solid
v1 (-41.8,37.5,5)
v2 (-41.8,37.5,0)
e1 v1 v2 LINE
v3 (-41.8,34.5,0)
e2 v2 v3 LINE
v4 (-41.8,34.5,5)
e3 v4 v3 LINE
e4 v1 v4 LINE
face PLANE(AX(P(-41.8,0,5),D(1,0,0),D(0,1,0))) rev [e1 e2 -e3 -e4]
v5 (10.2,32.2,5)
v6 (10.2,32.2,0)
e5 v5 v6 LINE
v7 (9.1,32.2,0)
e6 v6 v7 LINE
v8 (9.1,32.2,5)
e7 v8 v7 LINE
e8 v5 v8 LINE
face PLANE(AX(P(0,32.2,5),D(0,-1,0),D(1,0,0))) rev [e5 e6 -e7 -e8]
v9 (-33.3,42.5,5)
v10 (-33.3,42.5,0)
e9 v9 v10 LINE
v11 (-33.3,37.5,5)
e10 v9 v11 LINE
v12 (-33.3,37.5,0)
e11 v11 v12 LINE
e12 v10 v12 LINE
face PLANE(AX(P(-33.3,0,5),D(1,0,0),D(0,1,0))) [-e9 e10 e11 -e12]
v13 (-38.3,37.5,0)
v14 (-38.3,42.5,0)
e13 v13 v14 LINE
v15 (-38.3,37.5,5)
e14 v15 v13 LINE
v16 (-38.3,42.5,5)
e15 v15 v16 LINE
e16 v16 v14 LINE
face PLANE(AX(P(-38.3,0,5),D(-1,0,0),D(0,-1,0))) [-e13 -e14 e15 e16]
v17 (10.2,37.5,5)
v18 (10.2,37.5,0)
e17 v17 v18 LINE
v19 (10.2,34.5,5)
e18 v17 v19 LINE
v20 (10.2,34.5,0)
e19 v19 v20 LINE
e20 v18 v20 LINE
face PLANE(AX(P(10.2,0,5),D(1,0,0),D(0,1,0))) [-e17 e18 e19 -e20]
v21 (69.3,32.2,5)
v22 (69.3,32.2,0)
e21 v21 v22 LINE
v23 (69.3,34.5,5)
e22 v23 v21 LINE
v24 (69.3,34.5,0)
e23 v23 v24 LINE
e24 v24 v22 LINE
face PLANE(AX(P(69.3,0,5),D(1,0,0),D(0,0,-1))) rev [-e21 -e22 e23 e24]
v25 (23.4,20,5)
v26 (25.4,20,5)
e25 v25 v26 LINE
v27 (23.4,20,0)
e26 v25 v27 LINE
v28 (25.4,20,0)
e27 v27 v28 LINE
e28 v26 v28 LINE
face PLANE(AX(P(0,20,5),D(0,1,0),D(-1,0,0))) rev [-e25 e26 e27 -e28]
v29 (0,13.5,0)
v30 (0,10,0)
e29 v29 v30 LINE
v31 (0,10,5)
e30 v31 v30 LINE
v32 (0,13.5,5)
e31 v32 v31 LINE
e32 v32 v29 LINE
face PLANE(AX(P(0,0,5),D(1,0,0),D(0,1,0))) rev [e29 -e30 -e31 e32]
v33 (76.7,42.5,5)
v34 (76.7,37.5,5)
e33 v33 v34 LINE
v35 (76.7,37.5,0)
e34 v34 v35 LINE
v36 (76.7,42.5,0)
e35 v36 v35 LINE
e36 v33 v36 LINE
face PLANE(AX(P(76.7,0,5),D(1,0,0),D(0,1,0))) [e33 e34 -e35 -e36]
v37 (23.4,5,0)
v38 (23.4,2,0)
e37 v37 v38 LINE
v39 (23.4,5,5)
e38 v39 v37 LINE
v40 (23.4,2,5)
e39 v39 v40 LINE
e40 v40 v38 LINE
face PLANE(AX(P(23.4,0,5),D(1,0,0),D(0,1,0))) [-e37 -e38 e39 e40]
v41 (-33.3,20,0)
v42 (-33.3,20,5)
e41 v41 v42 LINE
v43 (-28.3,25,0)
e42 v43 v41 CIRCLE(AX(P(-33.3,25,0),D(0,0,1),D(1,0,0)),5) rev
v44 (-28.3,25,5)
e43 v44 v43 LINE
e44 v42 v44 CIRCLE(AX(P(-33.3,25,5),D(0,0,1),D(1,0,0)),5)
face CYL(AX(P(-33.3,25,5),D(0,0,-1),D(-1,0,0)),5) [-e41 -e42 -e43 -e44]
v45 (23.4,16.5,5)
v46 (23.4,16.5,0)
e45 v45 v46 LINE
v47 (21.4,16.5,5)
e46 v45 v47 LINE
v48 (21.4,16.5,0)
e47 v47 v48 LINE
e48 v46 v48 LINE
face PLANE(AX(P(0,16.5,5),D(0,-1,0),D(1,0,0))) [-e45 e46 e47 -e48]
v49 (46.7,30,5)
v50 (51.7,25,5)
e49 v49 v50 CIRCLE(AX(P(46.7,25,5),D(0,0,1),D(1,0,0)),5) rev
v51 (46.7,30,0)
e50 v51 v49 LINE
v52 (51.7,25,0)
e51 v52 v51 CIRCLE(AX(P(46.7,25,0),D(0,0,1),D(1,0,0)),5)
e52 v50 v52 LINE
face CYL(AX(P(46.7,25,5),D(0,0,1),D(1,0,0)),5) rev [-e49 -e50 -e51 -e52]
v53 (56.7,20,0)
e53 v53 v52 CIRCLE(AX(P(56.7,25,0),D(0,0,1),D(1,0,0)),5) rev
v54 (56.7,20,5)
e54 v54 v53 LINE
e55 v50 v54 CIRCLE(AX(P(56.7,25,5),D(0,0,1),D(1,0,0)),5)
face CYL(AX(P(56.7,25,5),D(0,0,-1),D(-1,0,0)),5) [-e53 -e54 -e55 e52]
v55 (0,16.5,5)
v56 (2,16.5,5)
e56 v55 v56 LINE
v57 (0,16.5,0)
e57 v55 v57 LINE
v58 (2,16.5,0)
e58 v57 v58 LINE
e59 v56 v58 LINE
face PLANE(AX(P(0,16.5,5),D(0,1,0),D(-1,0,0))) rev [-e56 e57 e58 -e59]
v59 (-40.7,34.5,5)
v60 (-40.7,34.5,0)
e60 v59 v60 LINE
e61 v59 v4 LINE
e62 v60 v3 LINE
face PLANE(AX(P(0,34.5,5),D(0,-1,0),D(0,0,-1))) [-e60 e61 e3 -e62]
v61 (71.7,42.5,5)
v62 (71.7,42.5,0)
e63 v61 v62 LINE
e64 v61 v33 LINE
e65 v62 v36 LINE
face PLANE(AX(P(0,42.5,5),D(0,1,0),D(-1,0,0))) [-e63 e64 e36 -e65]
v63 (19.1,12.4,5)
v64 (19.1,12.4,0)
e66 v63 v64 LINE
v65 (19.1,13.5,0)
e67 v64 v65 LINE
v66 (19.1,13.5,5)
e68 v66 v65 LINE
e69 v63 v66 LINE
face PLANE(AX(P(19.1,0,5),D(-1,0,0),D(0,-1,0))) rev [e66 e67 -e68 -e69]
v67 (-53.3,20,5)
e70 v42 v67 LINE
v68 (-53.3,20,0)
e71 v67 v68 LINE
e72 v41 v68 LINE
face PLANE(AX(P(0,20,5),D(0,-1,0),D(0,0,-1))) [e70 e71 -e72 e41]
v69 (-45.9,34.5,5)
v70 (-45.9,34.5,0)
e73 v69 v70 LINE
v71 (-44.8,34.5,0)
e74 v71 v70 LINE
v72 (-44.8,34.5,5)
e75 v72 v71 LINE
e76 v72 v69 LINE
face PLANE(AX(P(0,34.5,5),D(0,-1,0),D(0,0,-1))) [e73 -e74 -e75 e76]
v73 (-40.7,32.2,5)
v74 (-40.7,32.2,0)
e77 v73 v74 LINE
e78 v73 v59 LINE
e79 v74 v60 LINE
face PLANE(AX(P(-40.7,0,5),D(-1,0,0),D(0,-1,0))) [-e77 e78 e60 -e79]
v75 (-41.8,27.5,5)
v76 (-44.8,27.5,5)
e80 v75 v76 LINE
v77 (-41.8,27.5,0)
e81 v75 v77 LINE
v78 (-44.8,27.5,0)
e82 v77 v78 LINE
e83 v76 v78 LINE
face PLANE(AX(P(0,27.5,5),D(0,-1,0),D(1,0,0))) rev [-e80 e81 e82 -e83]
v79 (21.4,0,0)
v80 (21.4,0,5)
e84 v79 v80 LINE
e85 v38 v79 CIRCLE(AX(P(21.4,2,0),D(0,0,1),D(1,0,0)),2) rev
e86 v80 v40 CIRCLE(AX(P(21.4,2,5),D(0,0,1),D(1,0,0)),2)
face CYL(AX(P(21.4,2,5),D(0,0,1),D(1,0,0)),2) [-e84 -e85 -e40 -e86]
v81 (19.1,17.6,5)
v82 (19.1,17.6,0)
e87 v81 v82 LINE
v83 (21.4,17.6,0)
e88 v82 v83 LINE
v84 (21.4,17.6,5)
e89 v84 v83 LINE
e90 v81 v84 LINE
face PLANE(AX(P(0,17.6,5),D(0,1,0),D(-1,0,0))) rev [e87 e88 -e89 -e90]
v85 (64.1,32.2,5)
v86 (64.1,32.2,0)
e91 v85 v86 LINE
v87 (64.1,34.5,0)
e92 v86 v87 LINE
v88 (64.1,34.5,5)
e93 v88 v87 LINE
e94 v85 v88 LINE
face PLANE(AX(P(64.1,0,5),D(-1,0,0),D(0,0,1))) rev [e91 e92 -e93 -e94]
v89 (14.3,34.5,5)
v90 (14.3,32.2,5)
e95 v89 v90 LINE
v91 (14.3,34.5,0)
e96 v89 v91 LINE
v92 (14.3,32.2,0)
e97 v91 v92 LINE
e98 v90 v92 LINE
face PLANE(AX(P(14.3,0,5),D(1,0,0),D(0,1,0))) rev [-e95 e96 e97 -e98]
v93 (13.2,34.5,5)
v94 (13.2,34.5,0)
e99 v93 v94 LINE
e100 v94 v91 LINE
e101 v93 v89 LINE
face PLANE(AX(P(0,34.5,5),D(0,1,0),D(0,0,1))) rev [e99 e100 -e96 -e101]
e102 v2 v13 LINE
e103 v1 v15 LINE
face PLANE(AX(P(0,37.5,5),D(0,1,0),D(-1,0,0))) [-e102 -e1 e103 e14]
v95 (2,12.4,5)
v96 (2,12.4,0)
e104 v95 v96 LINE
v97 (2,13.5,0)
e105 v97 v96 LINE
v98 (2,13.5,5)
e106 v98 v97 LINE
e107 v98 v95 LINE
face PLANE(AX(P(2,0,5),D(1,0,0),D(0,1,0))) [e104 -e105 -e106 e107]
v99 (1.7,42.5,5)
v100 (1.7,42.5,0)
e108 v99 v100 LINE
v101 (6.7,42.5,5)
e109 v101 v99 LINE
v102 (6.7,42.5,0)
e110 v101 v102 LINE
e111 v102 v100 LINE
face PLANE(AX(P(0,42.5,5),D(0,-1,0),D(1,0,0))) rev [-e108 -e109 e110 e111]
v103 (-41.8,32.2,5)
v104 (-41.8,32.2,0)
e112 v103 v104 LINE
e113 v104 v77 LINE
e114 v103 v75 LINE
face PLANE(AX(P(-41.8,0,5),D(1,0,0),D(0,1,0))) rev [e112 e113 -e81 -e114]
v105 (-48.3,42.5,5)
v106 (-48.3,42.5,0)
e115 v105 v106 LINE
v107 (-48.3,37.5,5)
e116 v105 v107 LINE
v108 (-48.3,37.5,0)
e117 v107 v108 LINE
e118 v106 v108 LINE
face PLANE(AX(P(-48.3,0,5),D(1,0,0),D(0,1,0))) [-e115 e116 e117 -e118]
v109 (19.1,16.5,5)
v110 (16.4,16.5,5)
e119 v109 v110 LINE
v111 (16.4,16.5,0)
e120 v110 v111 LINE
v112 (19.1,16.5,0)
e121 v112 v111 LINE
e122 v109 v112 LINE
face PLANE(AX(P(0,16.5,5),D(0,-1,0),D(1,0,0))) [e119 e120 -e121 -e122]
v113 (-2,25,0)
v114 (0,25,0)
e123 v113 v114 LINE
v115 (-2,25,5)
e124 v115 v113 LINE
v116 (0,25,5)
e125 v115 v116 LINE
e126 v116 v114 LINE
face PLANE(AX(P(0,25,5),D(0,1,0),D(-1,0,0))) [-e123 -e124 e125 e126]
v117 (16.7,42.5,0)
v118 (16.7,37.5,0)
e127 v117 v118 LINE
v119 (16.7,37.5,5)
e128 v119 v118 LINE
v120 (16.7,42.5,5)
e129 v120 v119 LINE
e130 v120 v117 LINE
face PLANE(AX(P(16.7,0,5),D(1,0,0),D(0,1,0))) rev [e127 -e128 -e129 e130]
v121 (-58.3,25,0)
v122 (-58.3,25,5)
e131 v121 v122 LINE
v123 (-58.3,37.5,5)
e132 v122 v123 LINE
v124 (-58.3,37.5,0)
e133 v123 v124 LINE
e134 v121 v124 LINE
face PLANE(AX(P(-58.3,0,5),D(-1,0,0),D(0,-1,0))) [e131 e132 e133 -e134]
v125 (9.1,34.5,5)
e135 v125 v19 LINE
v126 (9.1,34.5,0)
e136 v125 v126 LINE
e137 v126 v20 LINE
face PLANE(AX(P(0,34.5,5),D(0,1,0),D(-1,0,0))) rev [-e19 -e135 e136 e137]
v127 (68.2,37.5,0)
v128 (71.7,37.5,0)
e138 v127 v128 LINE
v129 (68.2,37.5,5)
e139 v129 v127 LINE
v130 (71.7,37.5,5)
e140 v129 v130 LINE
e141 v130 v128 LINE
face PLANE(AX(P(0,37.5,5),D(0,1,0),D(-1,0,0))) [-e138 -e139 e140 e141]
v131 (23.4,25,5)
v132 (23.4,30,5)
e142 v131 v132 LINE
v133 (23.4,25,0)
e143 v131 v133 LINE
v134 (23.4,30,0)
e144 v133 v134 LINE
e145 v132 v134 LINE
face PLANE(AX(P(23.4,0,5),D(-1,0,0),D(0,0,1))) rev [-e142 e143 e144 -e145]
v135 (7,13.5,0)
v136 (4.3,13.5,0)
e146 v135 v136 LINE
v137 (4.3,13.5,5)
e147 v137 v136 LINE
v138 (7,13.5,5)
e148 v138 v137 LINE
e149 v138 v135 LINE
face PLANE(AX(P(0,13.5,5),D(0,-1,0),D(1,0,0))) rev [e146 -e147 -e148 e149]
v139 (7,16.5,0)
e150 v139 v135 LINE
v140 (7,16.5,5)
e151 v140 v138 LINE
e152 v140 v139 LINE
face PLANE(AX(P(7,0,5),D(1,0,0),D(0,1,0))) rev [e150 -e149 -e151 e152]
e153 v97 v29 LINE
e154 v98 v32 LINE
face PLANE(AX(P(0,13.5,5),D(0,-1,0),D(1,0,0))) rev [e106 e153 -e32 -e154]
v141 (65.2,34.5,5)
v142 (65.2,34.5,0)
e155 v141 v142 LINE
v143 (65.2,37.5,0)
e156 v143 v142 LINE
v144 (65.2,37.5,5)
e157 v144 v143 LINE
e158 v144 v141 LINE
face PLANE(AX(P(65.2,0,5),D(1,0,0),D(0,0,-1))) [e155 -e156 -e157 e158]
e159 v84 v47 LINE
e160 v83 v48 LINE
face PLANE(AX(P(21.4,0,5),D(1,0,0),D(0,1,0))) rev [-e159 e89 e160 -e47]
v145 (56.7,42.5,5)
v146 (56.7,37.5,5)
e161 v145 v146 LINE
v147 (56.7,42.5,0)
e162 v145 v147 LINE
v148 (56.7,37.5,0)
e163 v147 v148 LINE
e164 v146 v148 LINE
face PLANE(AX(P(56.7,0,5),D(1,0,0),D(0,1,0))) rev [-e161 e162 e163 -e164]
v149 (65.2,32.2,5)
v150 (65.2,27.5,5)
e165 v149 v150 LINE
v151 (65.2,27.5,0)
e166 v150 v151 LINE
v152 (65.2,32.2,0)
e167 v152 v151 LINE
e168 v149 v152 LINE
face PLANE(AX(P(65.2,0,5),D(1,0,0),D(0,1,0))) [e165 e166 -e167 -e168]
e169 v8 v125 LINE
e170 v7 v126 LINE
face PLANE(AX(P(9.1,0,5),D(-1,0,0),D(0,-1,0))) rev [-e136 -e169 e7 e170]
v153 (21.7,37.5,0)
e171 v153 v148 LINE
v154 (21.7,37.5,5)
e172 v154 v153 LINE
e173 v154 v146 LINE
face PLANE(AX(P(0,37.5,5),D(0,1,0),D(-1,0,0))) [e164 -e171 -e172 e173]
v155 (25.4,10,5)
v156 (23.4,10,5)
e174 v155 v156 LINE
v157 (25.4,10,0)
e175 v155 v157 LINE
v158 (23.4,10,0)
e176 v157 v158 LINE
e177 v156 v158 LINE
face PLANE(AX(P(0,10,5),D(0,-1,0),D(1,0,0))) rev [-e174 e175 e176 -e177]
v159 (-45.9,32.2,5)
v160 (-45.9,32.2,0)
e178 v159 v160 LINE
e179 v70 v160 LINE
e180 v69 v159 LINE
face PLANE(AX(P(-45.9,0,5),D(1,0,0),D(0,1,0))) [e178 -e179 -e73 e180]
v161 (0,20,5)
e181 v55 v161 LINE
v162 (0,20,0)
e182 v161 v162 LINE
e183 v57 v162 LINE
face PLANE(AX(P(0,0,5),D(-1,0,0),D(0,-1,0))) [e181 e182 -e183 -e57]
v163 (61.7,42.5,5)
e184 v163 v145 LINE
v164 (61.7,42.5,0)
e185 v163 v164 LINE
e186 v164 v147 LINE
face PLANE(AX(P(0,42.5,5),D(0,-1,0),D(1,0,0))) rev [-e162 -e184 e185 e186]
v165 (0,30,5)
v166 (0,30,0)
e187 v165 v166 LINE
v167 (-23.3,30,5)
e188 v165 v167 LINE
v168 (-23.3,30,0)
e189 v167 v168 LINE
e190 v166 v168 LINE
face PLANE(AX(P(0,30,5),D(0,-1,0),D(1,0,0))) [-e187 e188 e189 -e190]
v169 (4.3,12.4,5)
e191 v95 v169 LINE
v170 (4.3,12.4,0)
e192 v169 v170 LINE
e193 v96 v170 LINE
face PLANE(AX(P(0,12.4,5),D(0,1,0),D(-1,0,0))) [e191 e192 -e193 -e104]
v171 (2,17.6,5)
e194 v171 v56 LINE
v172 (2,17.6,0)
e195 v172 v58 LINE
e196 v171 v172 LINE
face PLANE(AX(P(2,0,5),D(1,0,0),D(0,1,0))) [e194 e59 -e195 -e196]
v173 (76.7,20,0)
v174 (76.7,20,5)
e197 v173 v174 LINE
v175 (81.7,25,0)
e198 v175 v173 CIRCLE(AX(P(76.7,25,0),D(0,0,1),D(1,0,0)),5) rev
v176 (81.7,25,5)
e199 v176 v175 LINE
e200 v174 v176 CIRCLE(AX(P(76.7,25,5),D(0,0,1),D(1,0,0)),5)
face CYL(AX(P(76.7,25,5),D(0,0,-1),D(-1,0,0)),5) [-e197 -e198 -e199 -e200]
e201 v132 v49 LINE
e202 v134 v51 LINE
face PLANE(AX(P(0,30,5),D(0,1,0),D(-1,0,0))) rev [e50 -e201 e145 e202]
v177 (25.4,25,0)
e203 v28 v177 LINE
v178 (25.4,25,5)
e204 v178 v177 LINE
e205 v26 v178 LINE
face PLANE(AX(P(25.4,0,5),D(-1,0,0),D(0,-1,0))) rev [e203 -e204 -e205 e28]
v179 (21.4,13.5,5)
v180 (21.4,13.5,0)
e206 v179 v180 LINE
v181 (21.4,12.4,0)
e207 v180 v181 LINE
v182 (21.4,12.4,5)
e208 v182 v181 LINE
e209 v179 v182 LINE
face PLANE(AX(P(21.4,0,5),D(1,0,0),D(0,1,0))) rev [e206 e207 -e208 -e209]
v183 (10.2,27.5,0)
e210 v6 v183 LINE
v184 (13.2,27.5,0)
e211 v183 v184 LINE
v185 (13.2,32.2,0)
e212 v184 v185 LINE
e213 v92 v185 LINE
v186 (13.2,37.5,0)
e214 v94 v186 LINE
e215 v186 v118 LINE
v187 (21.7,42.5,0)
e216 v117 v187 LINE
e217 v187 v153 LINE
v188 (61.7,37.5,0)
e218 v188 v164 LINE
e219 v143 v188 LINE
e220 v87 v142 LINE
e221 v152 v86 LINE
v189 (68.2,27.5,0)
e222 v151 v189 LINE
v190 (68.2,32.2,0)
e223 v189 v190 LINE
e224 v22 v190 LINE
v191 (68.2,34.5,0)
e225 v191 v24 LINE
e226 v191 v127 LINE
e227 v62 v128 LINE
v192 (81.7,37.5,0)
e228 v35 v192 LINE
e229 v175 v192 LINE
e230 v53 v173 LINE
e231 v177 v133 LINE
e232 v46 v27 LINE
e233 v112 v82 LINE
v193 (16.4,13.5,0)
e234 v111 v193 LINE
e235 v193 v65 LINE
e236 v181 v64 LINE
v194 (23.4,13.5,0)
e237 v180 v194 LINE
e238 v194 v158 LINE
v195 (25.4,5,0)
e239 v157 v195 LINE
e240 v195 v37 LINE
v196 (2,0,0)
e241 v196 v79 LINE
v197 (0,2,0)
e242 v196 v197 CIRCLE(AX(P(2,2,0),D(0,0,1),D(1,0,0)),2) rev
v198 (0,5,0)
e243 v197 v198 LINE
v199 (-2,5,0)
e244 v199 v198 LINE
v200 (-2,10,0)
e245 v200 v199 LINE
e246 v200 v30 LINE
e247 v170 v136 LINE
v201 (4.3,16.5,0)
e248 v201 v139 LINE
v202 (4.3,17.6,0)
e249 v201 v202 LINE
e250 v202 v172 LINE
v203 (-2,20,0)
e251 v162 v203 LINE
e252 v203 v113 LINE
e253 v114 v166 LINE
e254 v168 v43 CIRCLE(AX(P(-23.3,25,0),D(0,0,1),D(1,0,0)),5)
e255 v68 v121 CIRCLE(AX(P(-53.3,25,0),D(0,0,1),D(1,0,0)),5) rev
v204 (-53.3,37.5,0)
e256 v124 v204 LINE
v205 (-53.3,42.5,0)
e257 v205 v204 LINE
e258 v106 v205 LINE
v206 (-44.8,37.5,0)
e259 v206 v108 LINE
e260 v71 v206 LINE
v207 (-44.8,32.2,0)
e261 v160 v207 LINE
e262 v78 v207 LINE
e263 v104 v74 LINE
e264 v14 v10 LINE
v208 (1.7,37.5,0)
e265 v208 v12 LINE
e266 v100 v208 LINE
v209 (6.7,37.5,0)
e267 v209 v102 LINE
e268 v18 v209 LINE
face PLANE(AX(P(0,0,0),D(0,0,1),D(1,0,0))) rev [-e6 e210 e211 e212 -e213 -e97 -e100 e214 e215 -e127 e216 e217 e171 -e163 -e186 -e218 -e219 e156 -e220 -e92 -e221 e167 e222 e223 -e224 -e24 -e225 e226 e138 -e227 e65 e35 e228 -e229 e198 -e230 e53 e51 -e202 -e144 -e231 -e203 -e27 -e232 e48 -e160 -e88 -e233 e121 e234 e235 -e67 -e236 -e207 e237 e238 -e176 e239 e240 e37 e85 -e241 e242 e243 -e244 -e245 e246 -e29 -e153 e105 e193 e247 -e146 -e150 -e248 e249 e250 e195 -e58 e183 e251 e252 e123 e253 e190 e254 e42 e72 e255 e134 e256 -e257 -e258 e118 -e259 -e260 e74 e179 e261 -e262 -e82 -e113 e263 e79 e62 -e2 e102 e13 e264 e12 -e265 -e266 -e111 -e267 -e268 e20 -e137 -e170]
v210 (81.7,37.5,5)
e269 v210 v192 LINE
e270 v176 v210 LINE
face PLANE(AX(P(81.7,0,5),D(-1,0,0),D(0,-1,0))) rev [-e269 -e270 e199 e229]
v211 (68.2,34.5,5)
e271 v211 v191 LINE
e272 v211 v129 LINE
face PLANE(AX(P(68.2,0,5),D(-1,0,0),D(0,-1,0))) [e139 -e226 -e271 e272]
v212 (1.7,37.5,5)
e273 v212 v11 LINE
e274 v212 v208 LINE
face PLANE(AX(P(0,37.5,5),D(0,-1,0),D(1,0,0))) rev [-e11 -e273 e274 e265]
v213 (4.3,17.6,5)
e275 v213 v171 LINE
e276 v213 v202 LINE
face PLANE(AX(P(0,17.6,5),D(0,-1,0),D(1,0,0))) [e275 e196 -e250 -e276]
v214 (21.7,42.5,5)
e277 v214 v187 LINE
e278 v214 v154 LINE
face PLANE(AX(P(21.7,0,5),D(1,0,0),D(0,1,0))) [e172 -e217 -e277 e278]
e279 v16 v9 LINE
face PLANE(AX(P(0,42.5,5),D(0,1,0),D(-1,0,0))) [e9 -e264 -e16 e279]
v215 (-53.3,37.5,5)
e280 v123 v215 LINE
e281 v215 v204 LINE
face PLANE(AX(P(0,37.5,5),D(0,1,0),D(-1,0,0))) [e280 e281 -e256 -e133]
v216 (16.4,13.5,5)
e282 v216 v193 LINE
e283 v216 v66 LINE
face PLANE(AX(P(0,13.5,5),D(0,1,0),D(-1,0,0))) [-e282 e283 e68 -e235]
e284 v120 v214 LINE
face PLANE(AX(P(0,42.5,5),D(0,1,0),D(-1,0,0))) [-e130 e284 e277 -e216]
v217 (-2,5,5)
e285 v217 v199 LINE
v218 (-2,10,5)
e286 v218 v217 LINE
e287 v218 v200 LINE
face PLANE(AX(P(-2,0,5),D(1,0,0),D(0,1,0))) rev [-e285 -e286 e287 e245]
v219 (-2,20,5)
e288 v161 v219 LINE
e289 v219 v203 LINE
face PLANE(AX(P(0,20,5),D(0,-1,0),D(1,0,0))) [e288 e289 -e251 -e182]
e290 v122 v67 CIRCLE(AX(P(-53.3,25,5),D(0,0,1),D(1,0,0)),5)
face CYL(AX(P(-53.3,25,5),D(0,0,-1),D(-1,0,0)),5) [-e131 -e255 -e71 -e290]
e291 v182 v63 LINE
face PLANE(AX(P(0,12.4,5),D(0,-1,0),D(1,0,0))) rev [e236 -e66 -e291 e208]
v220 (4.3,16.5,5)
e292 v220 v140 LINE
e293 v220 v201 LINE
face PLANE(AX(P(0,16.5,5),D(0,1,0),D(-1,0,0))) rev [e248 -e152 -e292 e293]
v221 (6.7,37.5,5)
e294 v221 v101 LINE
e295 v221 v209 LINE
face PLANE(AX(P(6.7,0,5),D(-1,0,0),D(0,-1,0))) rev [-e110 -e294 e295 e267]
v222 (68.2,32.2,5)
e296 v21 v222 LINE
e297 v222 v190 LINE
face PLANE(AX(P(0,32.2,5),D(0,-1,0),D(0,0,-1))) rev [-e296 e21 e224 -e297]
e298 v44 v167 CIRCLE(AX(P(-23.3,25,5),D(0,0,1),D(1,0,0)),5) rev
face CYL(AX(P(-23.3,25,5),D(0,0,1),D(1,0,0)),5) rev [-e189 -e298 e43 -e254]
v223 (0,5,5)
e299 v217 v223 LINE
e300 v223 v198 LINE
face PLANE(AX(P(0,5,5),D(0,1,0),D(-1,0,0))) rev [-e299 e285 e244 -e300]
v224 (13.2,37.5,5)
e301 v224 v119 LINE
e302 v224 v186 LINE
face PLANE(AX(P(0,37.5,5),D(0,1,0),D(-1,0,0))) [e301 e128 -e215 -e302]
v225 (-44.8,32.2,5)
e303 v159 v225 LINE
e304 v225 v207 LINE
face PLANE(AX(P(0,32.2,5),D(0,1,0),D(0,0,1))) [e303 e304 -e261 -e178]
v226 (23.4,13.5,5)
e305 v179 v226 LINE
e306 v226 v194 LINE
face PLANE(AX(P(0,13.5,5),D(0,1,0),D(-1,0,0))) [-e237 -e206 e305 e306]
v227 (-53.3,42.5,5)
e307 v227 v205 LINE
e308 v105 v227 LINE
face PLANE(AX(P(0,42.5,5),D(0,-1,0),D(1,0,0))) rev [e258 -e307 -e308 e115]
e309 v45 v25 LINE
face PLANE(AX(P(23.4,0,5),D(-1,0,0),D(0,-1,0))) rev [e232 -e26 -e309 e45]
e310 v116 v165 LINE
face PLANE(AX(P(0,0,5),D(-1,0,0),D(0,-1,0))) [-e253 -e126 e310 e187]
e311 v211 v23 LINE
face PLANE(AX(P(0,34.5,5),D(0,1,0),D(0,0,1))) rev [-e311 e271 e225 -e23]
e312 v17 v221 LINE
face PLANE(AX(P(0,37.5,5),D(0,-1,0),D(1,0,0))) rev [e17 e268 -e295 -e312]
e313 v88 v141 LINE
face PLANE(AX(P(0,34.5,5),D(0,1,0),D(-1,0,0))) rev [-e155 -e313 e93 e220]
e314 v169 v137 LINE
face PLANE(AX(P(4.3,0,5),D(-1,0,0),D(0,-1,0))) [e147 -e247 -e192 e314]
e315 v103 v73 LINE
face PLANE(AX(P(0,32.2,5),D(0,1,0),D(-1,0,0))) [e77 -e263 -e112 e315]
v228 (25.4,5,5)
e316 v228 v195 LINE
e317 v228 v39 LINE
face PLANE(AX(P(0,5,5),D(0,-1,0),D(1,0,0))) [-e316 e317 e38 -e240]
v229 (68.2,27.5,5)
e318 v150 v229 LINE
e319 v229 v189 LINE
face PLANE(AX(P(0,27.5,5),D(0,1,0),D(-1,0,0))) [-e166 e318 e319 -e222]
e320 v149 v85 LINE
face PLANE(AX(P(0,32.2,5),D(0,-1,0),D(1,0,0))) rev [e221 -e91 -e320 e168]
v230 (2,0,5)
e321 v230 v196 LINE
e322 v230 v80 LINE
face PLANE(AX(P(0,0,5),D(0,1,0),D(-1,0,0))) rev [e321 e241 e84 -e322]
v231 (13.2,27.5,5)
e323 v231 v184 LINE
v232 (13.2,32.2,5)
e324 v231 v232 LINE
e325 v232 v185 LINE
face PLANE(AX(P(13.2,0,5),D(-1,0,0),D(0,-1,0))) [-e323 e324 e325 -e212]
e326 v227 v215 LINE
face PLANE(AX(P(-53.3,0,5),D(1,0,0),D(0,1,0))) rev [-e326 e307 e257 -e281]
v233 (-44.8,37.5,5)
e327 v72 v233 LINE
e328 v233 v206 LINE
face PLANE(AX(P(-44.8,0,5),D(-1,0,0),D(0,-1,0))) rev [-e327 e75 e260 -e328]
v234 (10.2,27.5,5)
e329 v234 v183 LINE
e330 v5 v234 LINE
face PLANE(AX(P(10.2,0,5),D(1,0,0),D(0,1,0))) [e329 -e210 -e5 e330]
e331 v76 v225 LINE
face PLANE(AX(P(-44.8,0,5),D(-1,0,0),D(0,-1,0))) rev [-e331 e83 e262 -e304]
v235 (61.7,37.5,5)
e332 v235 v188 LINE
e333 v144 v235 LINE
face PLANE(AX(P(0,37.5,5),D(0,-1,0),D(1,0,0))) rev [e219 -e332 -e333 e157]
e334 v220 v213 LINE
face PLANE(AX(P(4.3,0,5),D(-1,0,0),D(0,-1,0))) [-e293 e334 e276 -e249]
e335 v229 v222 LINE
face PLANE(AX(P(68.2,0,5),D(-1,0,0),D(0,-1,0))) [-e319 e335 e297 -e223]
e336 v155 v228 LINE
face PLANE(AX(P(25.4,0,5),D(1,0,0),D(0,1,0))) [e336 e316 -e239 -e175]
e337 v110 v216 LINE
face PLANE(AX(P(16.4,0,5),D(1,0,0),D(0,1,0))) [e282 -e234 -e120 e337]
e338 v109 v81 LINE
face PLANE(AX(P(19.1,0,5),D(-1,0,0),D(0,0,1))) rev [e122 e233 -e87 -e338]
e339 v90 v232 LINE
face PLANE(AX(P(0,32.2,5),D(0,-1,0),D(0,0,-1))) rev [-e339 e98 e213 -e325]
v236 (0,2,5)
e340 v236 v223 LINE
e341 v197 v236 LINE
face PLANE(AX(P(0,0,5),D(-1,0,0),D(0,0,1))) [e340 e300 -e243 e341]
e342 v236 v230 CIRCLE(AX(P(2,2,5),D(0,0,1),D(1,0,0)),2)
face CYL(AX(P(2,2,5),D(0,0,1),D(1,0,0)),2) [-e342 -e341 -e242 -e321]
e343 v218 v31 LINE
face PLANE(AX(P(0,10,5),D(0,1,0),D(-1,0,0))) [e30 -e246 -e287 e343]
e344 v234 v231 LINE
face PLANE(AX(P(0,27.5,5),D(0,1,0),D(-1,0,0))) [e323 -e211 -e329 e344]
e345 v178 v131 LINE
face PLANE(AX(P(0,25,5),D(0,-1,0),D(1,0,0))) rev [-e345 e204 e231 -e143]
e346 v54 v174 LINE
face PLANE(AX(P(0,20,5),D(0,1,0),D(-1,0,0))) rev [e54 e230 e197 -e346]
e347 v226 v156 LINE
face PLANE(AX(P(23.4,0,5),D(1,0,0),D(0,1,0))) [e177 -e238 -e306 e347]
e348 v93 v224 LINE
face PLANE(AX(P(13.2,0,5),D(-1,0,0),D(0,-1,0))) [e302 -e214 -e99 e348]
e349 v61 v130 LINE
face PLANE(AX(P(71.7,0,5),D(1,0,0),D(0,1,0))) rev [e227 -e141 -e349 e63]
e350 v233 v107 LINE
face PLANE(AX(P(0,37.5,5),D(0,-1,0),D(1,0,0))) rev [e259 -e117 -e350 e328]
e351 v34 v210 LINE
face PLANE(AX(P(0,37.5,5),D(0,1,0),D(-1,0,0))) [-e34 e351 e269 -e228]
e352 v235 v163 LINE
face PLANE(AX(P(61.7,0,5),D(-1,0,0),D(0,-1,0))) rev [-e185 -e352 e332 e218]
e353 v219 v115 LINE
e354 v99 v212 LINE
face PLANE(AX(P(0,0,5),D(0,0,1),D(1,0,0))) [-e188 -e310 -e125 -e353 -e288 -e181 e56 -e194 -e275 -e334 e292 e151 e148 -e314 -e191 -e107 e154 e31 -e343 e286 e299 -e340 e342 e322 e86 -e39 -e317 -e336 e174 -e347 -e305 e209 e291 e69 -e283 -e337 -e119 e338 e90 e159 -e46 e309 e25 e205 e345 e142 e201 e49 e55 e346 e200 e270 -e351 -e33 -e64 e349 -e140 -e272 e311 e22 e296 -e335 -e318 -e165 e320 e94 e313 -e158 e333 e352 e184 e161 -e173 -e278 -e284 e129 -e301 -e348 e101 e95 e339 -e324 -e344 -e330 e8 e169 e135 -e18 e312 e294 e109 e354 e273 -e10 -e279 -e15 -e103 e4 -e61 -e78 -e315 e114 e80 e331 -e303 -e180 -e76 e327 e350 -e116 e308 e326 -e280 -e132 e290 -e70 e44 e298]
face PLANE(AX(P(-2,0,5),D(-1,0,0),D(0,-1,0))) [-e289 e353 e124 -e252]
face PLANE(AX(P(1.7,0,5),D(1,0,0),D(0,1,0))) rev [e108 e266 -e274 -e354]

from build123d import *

# Parameters (mm, degrees)
BOSS_EXTRU_1_DEPTH = 5
CONG_1_R           = 5
FILLET1_R          = 2


with BuildPart() as part:
    # Esquisse1 → Boss.-Extru.1 (new body)
    with BuildSketch(Plane.XY):
        Polygon((25.4, 25), (23.4, 25), (23.4, 30), (51.7, 30), (51.7, 20), (81.7, 20), (81.7, 37.5), (76.7, 37.5), (76.7, 42.5), (71.7, 42.5), (71.7, 37.5), (68.2, 37.5), (68.2, 34.5), (69.3, 34.5), (69.3, 32.2), (68.2, 32.2), (68.2, 27.5), (65.2, 27.5), (65.2, 32.2), (64.1, 32.2), (64.1, 34.5), (65.2, 34.5), (65.2, 37.5), (61.7, 37.5), (61.7, 42.5), (56.7, 42.5), (56.7, 37.5), (21.7, 37.5), (21.7, 42.5), (16.7, 42.5), (16.7, 37.5), (13.2, 37.5), (13.2, 34.5), (14.3, 34.5), (14.3, 32.2), (13.2, 32.2), (13.2, 27.5), (10.2, 27.5), (10.2, 32.2), (9.1, 32.2), (9.1, 34.5), (10.2, 34.5), (10.2, 37.5), (6.7, 37.5), (6.7, 42.5), (1.7, 42.5), (1.7, 37.5), (-33.3, 37.5), (-33.3, 42.5), (-38.3, 42.5), (-38.3, 37.5), (-41.8, 37.5), (-41.8, 34.5), (-40.7, 34.5), (-40.7, 32.2), (-41.8, 32.2), (-41.8, 27.5), (-44.8, 27.5), (-44.8, 32.2), (-45.9, 32.2), (-45.9, 34.5), (-44.8, 34.5), (-44.8, 37.5), (-48.3, 37.5), (-48.3, 42.5), (-53.3, 42.5), (-53.3, 37.5), (-58.3, 37.5), (-58.3, 20), (-28.3, 20), (-28.3, 30), (0, 30), (0, 25), (-2, 25), (-2, 20), (0, 20), (0, 16.5), (2, 16.5), (2, 17.6), (4.3, 17.6), (4.3, 16.5), (7, 16.5), (7, 13.5), (4.3, 13.5), (4.3, 12.4), (2, 12.4), (2, 13.5), (0, 13.5), (0, 10), (-2, 10), (-2, 5), (0, 5), (0, 0), (23.4, 0), (23.4, 5), (25.4, 5), (25.4, 10), (23.4, 10), (23.4, 13.5), (21.4, 13.5), (21.4, 12.4), (19.1, 12.4), (19.1, 13.5), (16.4, 13.5), (16.4, 16.5), (19.1, 16.5), (19.1, 17.6), (21.4, 17.6), (21.4, 16.5), (23.4, 16.5), (23.4, 20), (25.4, 20), align=None)
    extrude(amount=BOSS_EXTRU_1_DEPTH)

    # Congé1
    cong_1_edges = [part.edges().sort_by_distance(p)[0] for p in [
        (-28.3, 30, 2.5),
        (-58.3, 20, 2.5),
        (-28.3, 20, 2.5),
        (81.7, 20, 2.5),
        (51.7, 20, 2.5),
        (51.7, 30, 2.5),
    ]]
    fillet(cong_1_edges, radius=CONG_1_R - 0.0001)  # a hair under: the kernel refuses the full size

    # Fillet1
    fillet1_edges = [part.edges().sort_by_distance(p)[0] for p in [
        (23.4, 0, 2.5),
        (0, 0, 2.5),
    ]]
    fillet(fillet1_edges, radius=FILLET1_R)


solid = part.part
